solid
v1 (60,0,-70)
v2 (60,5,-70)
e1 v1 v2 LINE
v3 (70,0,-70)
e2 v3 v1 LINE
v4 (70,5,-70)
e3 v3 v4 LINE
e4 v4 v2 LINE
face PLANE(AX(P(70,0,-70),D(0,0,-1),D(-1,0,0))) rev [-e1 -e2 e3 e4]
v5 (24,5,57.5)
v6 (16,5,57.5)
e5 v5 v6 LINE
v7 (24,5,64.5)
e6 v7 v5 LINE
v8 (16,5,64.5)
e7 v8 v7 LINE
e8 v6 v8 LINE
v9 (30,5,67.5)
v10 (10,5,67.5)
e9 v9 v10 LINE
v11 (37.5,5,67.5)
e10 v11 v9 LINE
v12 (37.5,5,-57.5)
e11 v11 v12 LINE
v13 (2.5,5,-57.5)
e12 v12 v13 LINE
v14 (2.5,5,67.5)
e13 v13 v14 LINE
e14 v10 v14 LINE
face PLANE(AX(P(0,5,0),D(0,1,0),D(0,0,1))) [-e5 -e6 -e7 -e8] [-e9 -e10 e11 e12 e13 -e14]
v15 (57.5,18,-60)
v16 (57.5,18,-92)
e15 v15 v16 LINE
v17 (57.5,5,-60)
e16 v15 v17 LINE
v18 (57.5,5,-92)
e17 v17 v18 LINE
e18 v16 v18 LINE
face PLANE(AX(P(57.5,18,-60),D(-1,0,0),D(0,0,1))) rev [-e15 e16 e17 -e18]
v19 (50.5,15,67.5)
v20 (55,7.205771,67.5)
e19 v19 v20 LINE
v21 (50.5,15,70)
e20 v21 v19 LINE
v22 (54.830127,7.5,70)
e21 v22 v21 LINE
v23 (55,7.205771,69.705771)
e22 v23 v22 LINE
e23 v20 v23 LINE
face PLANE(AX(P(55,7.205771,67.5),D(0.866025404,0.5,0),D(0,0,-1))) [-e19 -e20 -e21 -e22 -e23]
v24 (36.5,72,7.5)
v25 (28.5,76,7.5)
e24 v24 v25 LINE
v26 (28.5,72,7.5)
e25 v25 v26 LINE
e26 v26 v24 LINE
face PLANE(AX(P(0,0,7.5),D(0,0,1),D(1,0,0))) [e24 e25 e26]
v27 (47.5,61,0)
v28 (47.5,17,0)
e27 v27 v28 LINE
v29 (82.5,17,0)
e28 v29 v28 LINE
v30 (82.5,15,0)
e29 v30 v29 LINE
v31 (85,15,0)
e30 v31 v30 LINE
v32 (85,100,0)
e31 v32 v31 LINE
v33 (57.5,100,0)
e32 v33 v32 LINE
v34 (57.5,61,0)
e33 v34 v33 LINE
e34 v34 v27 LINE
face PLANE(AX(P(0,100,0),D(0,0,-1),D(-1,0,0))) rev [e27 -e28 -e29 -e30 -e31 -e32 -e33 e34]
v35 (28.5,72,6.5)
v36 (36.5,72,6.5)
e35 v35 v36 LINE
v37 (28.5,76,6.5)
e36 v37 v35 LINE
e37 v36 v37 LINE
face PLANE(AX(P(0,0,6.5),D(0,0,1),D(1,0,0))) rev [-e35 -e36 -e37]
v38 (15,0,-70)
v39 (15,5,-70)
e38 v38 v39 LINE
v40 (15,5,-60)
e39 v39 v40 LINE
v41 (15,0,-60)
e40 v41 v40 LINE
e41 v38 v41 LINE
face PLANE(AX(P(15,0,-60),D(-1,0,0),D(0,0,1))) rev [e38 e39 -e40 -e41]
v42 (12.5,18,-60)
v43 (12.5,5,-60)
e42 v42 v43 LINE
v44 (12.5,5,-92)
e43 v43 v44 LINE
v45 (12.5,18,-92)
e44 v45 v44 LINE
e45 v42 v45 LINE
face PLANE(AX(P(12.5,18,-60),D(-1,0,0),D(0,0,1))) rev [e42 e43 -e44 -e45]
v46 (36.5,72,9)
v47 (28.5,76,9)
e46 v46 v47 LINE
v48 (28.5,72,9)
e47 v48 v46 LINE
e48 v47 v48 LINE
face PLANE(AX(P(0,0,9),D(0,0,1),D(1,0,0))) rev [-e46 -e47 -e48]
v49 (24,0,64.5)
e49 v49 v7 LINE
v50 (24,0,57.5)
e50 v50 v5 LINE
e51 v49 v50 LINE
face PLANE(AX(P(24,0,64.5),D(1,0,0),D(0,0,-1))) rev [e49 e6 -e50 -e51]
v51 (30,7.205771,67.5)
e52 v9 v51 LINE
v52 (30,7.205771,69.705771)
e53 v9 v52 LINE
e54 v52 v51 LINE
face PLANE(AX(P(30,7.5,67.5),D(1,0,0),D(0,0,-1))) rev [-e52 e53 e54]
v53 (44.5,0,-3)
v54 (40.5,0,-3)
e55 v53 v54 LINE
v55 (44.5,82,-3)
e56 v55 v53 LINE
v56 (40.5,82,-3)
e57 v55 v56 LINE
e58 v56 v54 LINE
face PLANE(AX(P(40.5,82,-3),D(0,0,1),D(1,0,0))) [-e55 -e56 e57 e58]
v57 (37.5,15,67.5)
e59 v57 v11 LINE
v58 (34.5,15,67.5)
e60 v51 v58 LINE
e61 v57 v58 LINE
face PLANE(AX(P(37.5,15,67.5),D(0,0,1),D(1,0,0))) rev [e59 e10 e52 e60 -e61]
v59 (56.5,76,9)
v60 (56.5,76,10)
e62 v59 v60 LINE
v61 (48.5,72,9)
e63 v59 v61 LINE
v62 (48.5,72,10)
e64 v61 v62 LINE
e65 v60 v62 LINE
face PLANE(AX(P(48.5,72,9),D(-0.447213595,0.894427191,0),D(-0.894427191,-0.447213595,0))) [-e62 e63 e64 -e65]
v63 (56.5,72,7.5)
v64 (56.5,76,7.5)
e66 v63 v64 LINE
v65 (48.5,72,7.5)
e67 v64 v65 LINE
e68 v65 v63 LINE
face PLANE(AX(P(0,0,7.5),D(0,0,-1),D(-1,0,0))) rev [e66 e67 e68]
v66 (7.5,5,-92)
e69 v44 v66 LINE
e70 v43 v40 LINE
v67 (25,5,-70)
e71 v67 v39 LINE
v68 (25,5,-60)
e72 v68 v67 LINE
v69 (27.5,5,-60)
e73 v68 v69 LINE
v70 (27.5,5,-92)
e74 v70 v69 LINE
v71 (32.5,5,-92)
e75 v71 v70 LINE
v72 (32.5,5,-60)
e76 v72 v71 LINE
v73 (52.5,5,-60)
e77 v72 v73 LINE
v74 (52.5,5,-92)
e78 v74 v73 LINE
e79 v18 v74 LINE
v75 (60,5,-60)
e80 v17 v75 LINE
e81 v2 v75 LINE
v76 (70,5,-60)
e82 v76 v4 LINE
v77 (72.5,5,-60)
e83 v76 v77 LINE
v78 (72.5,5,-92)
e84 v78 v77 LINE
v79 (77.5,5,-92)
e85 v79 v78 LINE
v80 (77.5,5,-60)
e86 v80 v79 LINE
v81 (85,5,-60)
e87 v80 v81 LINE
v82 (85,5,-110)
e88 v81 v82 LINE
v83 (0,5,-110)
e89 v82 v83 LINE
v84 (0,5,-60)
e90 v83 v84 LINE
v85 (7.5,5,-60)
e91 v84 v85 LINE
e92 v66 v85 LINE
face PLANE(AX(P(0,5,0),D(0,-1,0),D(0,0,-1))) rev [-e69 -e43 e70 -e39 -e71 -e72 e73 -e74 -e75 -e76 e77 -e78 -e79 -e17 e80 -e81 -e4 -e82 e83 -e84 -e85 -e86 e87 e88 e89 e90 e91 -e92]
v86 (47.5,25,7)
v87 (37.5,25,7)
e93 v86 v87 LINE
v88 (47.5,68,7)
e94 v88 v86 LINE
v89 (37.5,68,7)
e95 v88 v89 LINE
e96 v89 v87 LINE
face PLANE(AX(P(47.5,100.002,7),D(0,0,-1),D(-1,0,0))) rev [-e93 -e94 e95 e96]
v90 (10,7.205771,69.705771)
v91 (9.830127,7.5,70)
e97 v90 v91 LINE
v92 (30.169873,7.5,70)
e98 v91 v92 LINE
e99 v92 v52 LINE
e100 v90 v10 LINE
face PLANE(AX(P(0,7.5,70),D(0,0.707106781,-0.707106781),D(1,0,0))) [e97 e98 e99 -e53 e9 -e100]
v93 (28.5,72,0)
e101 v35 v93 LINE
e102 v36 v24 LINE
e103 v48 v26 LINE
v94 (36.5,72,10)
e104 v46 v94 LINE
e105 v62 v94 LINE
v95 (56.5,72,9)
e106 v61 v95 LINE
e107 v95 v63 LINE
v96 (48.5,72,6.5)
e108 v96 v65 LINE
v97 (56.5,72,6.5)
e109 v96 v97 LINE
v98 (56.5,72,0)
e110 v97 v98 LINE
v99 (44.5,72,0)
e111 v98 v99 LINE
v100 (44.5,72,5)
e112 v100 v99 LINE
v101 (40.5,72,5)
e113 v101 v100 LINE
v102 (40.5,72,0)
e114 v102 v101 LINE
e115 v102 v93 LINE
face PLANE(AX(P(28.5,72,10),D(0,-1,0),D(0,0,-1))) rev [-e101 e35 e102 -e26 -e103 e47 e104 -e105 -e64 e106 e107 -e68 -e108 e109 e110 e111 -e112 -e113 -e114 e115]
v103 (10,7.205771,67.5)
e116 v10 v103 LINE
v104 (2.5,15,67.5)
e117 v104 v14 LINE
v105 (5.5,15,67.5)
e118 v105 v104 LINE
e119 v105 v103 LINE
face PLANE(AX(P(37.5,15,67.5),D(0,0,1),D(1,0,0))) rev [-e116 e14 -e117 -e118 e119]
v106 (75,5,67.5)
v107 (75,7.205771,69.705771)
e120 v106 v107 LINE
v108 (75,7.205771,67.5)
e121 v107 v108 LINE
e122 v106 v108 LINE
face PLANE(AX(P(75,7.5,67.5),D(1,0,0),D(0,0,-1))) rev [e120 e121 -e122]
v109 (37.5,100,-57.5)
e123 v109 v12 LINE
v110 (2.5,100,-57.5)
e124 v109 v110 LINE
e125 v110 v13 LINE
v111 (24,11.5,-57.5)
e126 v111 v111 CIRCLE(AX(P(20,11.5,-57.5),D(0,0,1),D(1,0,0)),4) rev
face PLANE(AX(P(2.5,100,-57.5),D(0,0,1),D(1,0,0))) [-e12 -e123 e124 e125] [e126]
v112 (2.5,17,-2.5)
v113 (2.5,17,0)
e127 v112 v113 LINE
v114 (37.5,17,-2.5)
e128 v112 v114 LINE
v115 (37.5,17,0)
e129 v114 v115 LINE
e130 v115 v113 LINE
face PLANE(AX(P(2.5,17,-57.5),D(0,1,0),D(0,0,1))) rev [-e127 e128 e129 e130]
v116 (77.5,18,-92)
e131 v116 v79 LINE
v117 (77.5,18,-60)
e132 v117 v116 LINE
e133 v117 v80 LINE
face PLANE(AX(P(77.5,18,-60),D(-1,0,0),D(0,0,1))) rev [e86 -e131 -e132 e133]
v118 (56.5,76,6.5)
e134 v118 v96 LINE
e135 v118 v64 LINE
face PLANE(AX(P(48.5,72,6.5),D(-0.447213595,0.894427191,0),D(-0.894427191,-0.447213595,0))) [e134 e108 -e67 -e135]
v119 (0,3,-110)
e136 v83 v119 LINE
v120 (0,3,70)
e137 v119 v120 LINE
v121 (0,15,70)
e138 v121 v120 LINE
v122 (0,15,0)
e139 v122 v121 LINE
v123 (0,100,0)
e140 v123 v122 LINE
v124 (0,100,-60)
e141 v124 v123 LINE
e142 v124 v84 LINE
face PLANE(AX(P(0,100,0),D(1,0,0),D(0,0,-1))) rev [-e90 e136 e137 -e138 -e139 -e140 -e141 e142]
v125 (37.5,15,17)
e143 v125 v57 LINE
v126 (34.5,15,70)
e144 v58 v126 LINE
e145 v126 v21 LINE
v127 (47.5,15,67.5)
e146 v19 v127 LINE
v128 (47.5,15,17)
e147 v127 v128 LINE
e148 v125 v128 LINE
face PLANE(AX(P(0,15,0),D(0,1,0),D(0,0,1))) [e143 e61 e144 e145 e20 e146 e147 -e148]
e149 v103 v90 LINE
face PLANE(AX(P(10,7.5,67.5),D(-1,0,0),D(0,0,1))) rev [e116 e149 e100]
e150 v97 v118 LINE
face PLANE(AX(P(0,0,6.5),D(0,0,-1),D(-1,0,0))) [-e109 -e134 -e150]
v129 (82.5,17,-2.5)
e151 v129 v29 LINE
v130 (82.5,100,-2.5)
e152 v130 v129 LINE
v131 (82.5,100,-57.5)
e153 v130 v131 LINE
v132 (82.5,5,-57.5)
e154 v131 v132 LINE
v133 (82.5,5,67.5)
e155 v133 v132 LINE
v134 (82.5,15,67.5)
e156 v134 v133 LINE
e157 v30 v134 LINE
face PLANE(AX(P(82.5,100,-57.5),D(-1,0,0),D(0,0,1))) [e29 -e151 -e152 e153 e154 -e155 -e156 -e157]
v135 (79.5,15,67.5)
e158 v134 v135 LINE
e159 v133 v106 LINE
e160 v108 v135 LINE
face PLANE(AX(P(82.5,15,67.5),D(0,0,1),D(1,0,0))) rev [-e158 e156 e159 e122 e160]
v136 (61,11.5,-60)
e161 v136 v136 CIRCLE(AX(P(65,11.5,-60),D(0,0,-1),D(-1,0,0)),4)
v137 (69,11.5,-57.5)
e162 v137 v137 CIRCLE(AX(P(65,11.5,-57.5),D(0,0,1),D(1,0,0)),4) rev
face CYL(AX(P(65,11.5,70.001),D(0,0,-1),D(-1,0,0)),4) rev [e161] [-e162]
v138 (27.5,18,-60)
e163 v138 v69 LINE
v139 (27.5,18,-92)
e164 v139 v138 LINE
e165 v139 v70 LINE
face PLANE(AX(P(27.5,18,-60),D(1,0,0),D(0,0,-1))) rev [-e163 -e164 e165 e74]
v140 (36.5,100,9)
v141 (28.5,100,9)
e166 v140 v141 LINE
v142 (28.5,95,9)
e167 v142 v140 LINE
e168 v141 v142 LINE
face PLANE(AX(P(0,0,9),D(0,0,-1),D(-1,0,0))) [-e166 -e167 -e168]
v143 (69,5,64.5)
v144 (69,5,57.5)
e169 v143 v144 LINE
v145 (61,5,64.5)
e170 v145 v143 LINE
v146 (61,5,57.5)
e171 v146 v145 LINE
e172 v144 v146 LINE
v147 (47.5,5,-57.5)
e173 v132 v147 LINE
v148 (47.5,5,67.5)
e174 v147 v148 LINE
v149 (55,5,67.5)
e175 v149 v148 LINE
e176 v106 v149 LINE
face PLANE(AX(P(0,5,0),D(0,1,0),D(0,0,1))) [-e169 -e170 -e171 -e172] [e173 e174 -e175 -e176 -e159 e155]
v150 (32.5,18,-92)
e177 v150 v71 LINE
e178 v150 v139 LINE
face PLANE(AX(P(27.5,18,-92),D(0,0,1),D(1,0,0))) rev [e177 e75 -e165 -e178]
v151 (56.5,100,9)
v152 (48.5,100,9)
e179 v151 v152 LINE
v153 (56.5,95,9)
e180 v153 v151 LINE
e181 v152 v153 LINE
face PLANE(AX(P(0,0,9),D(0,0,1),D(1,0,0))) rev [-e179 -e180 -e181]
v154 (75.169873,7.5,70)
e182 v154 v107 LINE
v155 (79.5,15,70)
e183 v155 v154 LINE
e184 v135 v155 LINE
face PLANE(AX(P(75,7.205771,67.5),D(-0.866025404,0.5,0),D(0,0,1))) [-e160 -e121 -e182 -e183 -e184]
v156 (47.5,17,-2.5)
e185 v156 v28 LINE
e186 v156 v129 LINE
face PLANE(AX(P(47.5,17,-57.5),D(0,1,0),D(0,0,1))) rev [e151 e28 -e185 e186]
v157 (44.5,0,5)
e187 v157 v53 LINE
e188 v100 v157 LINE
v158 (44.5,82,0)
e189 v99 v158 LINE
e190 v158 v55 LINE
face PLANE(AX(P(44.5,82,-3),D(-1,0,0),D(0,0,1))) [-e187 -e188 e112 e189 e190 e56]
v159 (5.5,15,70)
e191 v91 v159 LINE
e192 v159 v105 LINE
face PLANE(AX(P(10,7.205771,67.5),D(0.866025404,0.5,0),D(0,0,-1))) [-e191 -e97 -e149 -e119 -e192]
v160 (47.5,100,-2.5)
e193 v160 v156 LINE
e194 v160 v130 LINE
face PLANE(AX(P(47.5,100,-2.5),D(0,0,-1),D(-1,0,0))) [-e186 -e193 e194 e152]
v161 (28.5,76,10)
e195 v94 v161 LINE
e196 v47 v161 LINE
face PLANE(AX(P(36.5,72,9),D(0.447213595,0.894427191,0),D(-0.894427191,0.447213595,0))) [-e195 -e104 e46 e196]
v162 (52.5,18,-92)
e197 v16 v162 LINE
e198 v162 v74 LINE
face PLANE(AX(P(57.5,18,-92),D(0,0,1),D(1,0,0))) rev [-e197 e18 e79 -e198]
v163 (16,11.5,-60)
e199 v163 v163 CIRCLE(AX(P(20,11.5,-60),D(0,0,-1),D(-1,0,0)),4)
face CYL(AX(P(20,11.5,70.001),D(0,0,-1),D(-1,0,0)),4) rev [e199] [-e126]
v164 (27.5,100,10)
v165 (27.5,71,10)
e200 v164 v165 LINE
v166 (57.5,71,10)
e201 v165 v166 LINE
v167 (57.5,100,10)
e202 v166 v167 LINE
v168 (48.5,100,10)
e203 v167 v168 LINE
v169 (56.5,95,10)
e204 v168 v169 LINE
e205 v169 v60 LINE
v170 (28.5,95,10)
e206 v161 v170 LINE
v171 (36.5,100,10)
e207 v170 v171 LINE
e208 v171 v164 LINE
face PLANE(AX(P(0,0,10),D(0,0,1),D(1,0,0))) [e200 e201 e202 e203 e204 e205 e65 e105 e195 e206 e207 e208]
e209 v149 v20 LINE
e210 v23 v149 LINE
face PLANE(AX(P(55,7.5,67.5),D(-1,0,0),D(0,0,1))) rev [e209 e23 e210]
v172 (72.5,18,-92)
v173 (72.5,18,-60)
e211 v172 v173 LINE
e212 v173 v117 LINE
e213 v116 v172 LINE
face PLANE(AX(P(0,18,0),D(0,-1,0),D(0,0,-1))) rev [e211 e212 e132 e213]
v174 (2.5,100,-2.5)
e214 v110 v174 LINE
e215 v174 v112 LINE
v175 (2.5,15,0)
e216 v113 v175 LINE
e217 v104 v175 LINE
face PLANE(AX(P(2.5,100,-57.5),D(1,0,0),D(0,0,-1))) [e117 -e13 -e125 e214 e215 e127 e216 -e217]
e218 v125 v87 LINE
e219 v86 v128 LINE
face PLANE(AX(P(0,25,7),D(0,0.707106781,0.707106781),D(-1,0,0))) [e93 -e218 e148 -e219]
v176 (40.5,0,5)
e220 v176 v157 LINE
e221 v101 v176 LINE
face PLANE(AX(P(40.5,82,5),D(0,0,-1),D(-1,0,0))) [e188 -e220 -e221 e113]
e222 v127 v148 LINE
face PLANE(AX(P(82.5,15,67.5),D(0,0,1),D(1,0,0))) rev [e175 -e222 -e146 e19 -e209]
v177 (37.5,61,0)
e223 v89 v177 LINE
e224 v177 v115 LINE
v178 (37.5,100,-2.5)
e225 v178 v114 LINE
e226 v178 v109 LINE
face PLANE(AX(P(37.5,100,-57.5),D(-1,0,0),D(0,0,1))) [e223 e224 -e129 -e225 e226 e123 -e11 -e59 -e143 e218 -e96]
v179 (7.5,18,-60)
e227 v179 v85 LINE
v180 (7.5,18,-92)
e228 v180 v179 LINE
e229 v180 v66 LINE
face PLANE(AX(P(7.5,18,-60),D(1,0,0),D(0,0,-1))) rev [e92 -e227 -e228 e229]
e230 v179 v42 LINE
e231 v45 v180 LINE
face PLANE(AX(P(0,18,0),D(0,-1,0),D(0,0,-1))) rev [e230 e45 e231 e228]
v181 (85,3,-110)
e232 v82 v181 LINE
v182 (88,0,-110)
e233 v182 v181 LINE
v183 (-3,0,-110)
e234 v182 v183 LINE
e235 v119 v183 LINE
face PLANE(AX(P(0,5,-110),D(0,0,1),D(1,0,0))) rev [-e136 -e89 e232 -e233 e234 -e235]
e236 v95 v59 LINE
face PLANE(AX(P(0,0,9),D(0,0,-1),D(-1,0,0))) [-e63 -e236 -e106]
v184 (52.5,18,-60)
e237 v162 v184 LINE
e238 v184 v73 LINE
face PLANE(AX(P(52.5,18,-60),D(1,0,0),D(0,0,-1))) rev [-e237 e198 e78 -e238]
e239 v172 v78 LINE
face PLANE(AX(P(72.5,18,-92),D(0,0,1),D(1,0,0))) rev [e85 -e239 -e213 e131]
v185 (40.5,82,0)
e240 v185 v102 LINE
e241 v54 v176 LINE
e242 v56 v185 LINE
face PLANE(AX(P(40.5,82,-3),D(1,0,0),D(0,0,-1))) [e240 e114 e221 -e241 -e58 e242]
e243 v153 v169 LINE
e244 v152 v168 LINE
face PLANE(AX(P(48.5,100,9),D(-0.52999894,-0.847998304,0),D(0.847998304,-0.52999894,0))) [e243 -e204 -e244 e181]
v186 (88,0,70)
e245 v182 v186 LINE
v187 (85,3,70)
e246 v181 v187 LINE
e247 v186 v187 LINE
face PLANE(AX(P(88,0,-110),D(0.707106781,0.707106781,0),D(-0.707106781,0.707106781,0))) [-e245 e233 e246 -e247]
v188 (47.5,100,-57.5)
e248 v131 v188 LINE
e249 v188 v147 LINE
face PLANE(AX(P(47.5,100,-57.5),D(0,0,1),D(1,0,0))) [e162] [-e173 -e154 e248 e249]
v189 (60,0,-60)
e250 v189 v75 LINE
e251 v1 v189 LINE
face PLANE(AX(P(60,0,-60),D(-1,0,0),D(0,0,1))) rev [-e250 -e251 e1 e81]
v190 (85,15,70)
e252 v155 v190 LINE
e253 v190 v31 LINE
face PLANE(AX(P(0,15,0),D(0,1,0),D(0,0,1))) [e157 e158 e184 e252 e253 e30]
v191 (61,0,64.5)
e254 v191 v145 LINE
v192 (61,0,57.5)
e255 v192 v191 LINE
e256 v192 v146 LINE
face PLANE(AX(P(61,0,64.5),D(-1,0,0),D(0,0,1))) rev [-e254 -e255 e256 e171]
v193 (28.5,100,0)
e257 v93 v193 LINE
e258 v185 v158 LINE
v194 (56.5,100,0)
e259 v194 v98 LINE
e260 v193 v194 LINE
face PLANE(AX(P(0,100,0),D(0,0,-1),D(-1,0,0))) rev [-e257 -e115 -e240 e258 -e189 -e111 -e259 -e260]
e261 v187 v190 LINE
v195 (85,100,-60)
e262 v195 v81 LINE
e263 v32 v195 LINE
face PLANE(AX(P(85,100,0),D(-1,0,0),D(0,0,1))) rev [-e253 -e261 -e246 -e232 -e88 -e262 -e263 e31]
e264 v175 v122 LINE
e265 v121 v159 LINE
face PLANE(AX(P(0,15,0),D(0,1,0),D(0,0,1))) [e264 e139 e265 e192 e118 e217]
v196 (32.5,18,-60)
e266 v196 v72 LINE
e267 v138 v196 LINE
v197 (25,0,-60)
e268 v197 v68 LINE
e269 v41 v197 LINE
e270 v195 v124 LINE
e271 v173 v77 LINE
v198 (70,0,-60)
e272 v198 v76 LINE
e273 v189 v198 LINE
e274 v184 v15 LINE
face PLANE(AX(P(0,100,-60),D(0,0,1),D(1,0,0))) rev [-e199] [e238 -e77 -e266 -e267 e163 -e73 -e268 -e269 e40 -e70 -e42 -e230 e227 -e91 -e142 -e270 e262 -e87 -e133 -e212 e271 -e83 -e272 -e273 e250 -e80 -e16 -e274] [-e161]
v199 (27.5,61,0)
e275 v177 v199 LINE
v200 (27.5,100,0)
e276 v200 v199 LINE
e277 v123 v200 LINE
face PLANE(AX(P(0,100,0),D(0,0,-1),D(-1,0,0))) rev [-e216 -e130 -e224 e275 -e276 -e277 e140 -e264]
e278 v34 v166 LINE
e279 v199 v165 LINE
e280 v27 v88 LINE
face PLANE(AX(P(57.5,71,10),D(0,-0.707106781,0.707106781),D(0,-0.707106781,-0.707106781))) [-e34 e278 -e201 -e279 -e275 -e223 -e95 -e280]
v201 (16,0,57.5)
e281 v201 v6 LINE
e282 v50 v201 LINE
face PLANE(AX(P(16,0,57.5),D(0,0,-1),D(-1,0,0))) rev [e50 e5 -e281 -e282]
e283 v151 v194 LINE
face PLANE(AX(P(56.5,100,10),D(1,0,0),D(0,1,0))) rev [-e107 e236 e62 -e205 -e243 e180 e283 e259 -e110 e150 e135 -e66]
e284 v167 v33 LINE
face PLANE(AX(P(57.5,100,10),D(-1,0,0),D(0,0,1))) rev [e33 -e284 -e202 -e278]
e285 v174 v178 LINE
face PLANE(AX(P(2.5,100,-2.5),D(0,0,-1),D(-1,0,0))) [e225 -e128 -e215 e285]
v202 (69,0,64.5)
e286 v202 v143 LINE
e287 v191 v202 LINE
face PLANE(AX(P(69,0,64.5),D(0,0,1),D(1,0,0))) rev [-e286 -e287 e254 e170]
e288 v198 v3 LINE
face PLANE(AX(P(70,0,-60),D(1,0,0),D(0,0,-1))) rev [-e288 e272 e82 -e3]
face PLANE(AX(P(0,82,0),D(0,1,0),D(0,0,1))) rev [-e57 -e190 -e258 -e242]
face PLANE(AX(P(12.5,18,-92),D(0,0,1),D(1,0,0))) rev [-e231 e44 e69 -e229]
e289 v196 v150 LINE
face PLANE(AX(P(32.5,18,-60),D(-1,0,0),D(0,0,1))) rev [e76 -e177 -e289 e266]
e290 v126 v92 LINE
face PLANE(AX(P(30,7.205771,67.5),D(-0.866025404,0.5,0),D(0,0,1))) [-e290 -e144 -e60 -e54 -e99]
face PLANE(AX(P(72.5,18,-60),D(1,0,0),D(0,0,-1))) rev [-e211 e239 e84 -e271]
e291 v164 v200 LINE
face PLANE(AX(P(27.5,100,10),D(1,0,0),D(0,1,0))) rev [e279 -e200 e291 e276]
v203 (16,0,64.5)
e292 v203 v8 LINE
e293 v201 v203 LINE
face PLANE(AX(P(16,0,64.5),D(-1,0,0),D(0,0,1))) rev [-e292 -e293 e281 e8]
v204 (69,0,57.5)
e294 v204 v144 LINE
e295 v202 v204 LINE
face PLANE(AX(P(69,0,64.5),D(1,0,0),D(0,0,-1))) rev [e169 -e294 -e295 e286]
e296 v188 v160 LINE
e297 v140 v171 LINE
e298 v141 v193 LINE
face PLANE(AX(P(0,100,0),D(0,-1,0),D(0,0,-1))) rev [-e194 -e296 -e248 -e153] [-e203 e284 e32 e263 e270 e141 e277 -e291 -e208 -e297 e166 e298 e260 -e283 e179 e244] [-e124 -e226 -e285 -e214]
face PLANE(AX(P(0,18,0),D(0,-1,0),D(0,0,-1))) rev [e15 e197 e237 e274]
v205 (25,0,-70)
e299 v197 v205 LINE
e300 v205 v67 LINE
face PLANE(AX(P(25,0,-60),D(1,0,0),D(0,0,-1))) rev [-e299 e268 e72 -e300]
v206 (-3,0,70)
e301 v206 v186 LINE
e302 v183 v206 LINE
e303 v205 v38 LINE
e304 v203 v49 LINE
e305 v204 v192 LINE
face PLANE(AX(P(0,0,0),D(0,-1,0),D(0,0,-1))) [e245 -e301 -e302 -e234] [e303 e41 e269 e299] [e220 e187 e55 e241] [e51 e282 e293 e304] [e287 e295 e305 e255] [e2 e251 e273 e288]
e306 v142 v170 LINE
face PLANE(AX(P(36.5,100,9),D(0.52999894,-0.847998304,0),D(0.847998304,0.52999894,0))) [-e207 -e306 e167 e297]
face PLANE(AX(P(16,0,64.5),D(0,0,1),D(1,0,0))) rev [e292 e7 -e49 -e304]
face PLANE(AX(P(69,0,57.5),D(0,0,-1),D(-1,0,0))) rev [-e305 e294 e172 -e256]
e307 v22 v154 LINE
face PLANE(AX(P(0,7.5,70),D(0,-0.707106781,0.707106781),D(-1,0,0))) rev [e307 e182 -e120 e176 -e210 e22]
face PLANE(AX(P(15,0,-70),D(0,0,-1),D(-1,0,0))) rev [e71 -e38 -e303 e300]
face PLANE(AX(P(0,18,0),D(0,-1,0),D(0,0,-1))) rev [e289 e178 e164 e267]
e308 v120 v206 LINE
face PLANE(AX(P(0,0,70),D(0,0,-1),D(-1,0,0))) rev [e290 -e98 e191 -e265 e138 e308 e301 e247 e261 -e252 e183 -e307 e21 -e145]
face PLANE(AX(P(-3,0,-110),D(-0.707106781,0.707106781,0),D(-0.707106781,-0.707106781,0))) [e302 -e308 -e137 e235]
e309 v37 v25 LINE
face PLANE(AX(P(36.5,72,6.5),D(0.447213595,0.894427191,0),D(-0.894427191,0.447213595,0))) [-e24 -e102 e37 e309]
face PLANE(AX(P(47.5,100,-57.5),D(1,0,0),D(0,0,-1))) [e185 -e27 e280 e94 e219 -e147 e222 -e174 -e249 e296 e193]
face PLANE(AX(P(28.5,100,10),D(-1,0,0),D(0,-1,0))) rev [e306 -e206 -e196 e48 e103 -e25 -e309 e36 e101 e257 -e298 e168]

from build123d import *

# Parameters (mm, degrees)
SKETCH1_W                                 = 85
SKETCH1_H                                 = 60
BOSS_EXTRUDE1_DEPTH                       = 100
CUT_EXTRUDE1_START                        = 5
SKETCH2_W                                 = 35
SKETCH2_H                                 = 55
CUT_EXTRUDE1_DEPTH                        = 95
SKETCH3_W                                 = 85
SKETCH3_H                                 = 5
BOSS_EXTRUDE2_DEPTH                       = 70
BOSS_EXTRUDE3_DEPTH                       = 10
SKETCH5_W                                 = 20
SKETCH5_H                                 = 2.5
CUT_EXTRUDE2_DEPTH                        = 7.5
SKETCH6_W                                 = 35
SKETCH6_H                                 = 12
CUT_EXTRUDE4_DEPTH                        = 57.5
CUT_EXTRUDE6_REACH                        = 186.73
SKETCH7_R                                 = 4
SKETCH9_W                                 = 85
SKETCH9_H                                 = 50
BOSS_EXTRUDE4_DEPTH                       = 5
SKETCH13_W                                = 8
SKETCH13_H                                = 7
CUT_EXTRUDE8_BUTTON_HOLES_DEPTH           = 169.374582405
BOSS_EXTRUDE5_OLED_MOUNT_DEPTH            = 10
BOSS_EXTRUDE6_OLED_MOUNT_DEPTH            = 1
BOSS_EXTRUDE7_START                       = -2.5
BOSS_EXTRUDE7_OLED_MOUNT_DEPTH            = 1
BOSS_EXTRUDE8_OLED_MOUNT_DEPTH            = 1
BOSS_EXTRUDE13_OLED_MOUNT_SUPPORT_DEPTH   = 30
CUT_EXTRUDE9_OLED_CABLE_DEPTH             = 10
CUT_EXTRUDE9_OLED_CABLE_DEPTH_BACK        = 157.553505231
SKETCH18_W                                = 4
SKETCH18_H                                = 8
BOSS_EXTRUDE12_OLED_CABLE_GUIDE_REACH     = 164.942
SKETCH20_W                                = 10
SKETCH20_H                                = 10
CUT_EXTRUDE10_SOLENOID_WIRE_HOLE_DEPTH    = 169.374582405
SKETCH21_W                                = 5
SKETCH21_H                                = 32
BOSS_EXTRUDE9_SOLENOID_SIDE_SUPPORT_DEPTH = 13
CHAMFER3_THUMB_SIZE                       = 2.5
CHAMFER5_THUMB_SIZE                       = 4.5
CHAMFER5_THUMB_SIZE2                      = 7.794228634
CHAMFER5_THUMB_PART_2_SIZE                = 4.5
CHAMFER5_THUMB_PART_2_SIZE2               = 7.794228634
CHAMFER5_THUMB_PART_3_SIZE                = 4.5
CHAMFER5_THUMB_PART_3_SIZE2               = 7.794228634
BOSS_EXTRUDE5_GUIDE_DEPTH                 = 180
SKETCH49_W                                = 10
SKETCH49_H                                = 10
BOSS_EXTRUDE14_DEPTH                      = 10
CHAMFER8_SIZE                             = 10


with BuildPart() as part:
    # Sketch1 → Boss-Extrude1 (new body)
    with BuildSketch(Plane(origin=(0, 0, 0), x_dir=(1, 0, 0), z_dir=(0, 1, 0))):
        with Locations((42.5, 30)):
            Rectangle(SKETCH1_W, SKETCH1_H)
    extrude(amount=BOSS_EXTRUDE1_DEPTH)

    # Sketch2 → Cut-Extrude1 (cut)
    with BuildSketch(Plane(origin=(0, 0, 0), x_dir=(1, 0, 0), z_dir=(0, 1, 0)).offset(CUT_EXTRUDE1_START)):
        with Locations((20, 30)):
            Rectangle(SKETCH2_W, SKETCH2_H)
        with Locations((65, 30)):
            Rectangle(SKETCH2_W, SKETCH2_H)
    extrude(amount=CUT_EXTRUDE1_DEPTH, mode=Mode.SUBTRACT)

    # Sketch3 → Boss-Extrude2 (add)
    with BuildSketch(Plane.XY):
        with Locations((42.5, 2.5)):
            Rectangle(SKETCH3_W, SKETCH3_H)
    extrude(amount=BOSS_EXTRUDE2_DEPTH)

    # Sketch4 → Boss-Extrude3 (add)
    with BuildSketch(Plane(origin=(0, 5, 0), x_dir=(1, 0, 0), z_dir=(0, 1, 0))):
        Polygon((85, 0), (82.5, 0), (82.5, -67.5), (47.5, -67.5), (47.5, 0), (37.5, 0), (37.5, -67.5), (2.5, -67.5), (2.5, 0), (0, 0), (0, -70), (85, -70), align=None)
    extrude(amount=BOSS_EXTRUDE3_DEPTH)

    # Sketch5 → Cut-Extrude2 (cut)
    with BuildSketch(Plane(origin=(0, 15, 0), x_dir=(1, 0, 0), z_dir=(0, 1, 0))):
        with Locations((20, -68.75)):
            Rectangle(SKETCH5_W, SKETCH5_H)
        with Locations((65, -68.75)):
            Rectangle(SKETCH5_W, SKETCH5_H)
    extrude(amount=-CUT_EXTRUDE2_DEPTH, mode=Mode.SUBTRACT)

    # Sketch6 → Cut-Extrude4 (cut)
    with BuildSketch(Plane.XY):
        with Locations((20, 11)):
            Rectangle(SKETCH6_W, SKETCH6_H)
        with Locations((65, 11)):
            Rectangle(SKETCH6_W, SKETCH6_H)
    extrude(amount=-CUT_EXTRUDE4_DEPTH, mode=Mode.SUBTRACT)

    # Sketch7 → Cut-Extrude6 (cut, up to next)
    with BuildSketch(Plane(origin=(0, 0, -60), x_dir=(-1, 0, 0), z_dir=(0, 0, -1)), mode=Mode.PRIVATE) as cut_extrude6_sk1:
        with Locations((-20, 11.5)):
            Circle(SKETCH7_R)
    cut_extrude6_tool1 = extrude(cut_extrude6_sk1.sketch, amount=-CUT_EXTRUDE6_REACH, mode=Mode.PRIVATE) & part.part
    # Sketch7 → Cut-Extrude6 (cut, up to next)
    with BuildSketch(Plane(origin=(0, 0, -60), x_dir=(-1, 0, 0), z_dir=(0, 0, -1)), mode=Mode.PRIVATE) as cut_extrude6_sk2:
        with Locations((-65, 11.5)):
            Circle(SKETCH7_R)
    cut_extrude6_tool2 = extrude(cut_extrude6_sk2.sketch, amount=-CUT_EXTRUDE6_REACH, mode=Mode.PRIVATE) & part.part
    add(cut_extrude6_tool1.solids().sort_by_distance((20, 11.5, -60))[0], mode=Mode.SUBTRACT)
    add(cut_extrude6_tool2.solids().sort_by_distance((65, 11.5, -60))[0], mode=Mode.SUBTRACT)

    # Sketch9 → Boss-Extrude4 (add)
    with BuildSketch(Plane(origin=(0, 0, 0), x_dir=(1, 0, 0), z_dir=(0, 1, 0))):
        with Locations((42.5, 85)):
            Rectangle(SKETCH9_W, SKETCH9_H)
    extrude(amount=BOSS_EXTRUDE4_DEPTH)

    # Sketch13 → Cut-Extrude8 (Button Holes) (cut, through all)
    with BuildSketch(Plane(origin=(0, 5, 0), x_dir=(1, 0, 0), z_dir=(0, 1, 0))):
        with Locations((20, -61)):
            Rectangle(SKETCH13_W, SKETCH13_H)
        with Locations((65, -61)):
            Rectangle(SKETCH13_W, SKETCH13_H)
    extrude(amount=-CUT_EXTRUDE8_BUTTON_HOLES_DEPTH, mode=Mode.SUBTRACT)

    # Sketch14 → Boss-Extrude5 (OLED Mount) (add)
    with BuildSketch(Plane.XY):
        Polygon((27.5, 100), (28.5, 100), (28.5, 72), (56.5, 72), (56.5, 100), (57.5, 100), (57.5, 71), (52.172712592, 71), (32.827287408, 71), (27.5, 71), align=None)
    extrude(amount=BOSS_EXTRUDE5_OLED_MOUNT_DEPTH)

    # Sketch15 → Boss-Extrude6 (OLED Mount) (add)
    with BuildSketch(Plane.XY.offset(10)):
        Polygon((28.5, 72), (36.5, 72), (28.5, 76), align=None)
        Polygon((56.5, 76), (56.5, 72), (48.5, 72), align=None)
    extrude(amount=-BOSS_EXTRUDE6_OLED_MOUNT_DEPTH)

    # Sketch15<2> → Boss-Extrude7 (OLED Mount) (add)
    with BuildSketch(Plane.XY.offset(10).offset(BOSS_EXTRUDE7_START)):
        Polygon((28.5, 72), (36.5, 72), (28.5, 76), align=None)
        Polygon((56.5, 76), (56.5, 72), (48.5, 72), align=None)
    extrude(amount=-BOSS_EXTRUDE7_OLED_MOUNT_DEPTH)

    # Sketch17 → Boss-Extrude8 (OLED Mount) (add)
    with BuildSketch(Plane.XY.offset(10)):
        Polygon((56.5, 95), (56.5, 100), (48.5, 100), align=None)
        Polygon((28.5, 100), (36.5, 100), (28.5, 95), align=None)
    extrude(amount=-BOSS_EXTRUDE8_OLED_MOUNT_DEPTH)

    # Sketch32 → Boss-Extrude13 OLED Mount Support) (add)
    with BuildSketch(Plane.ZY.offset(-27.5)):
        Polygon((0, 71), (10, 71), (0, 61), align=None)
    extrude(amount=-BOSS_EXTRUDE13_OLED_MOUNT_SUPPORT_DEPTH)

    # Sketch18 → Cut-Extrude9 (OLED Cable) (cut, two sides: drawn at the far end of the back side and taken through both)
    with BuildSketch(Plane(origin=(0, 72, 0), x_dir=(1, 0, 0), z_dir=(0, 1, 0)).offset(-CUT_EXTRUDE9_OLED_CABLE_DEPTH_BACK)):
        with Locations((42.5, -1)):
            Rectangle(SKETCH18_W, SKETCH18_H)
    extrude(amount=CUT_EXTRUDE9_OLED_CABLE_DEPTH + CUT_EXTRUDE9_OLED_CABLE_DEPTH_BACK, mode=Mode.SUBTRACT)

    # Boss-Extrude12 (OLED Cable Guide): up to this plane
    boss_extrude12_oled_cable_guide_end = Plane(origin=(57.5, 71, 10), z_dir=(0, -0.7071067811865475, 0.7071067811865476))
    # Sketch31 → Boss-Extrude12 (OLED Cable Guide) (add, up to the surface)
    with BuildSketch(Plane(origin=(0, 15, 0), x_dir=(1, 0, 0), z_dir=(0, 1, 0)), mode=Mode.PRIVATE) as boss_extrude12_oled_cable_guide_sk1:
        Polygon((37.5, 0), (40.5, 0), (40.5, -5), (44.5, -5), (44.5, 0), (47.5, 0), (47.5, -7), (37.5, -7), align=None)
    boss_extrude12_oled_cable_guide_tool1 = split(extrude(boss_extrude12_oled_cable_guide_sk1.sketch, amount=BOSS_EXTRUDE12_OLED_CABLE_GUIDE_REACH, mode=Mode.PRIVATE), bisect_by=boss_extrude12_oled_cable_guide_end, keep=Keep.BOTH, mode=Mode.PRIVATE)
    add(boss_extrude12_oled_cable_guide_tool1.solids().sort_by_distance((39, 15, 0.122066))[0])

    # Sketch20 → Cut-Extrude10 (Solenoid Wire Hole) (cut, through all)
    with BuildSketch(Plane(origin=(0, 5, 0), x_dir=(1, 0, 0), z_dir=(0, 1, 0))):
        with Locations((65, 65)):
            Rectangle(SKETCH20_W, SKETCH20_H)
        with Locations((20, 65)):
            Rectangle(SKETCH20_W, SKETCH20_H)
    extrude(amount=-CUT_EXTRUDE10_SOLENOID_WIRE_HOLE_DEPTH, mode=Mode.SUBTRACT)

    # Sketch21 → Boss-Extrude9 (Solenoid Side Support) (add)
    with BuildSketch(Plane(origin=(0, 5, 0), x_dir=(1, 0, 0), z_dir=(0, 1, 0))):
        with Locations((75, 76)):
            Rectangle(SKETCH21_W, SKETCH21_H)
        with Locations((55, 76)):
            Rectangle(SKETCH21_W, SKETCH21_H)
        with Locations((30, 76)):
            Rectangle(SKETCH21_W, SKETCH21_H)
        with Locations((10, 76)):
            Rectangle(SKETCH21_W, SKETCH21_H)
    extrude(amount=BOSS_EXTRUDE9_SOLENOID_SIDE_SUPPORT_DEPTH)

    # Chamfer3 (Thumb)
    chamfer3_thumb_edges = [part.edges().sort_by_distance(p)[0] for p in [
        (20, 7.5, 67.5),
        (65, 7.5, 67.5),
    ]]
    chamfer(chamfer3_thumb_edges, length=CHAMFER3_THUMB_SIZE - 0.0001)  # a hair under: the kernel refuses the full size

    # Chamfer5 (Thumb)
    chamfer5_thumb_edges = [part.edges().sort_by_distance(p)[0] for p in [
        (75, 15, 68.75),
    ]]
    chamfer5_thumb_side = [part.faces().sort_by_distance(p)[0] for p in [
        (83.266129032, 15, 38.266129032),
    ]]
    chamfer(chamfer5_thumb_edges, length=CHAMFER5_THUMB_SIZE, length2=CHAMFER5_THUMB_SIZE2, reference=chamfer5_thumb_side[0])

    # Chamfer5 (Thumb) part 2
    chamfer5_thumb_part_2_edges = [part.edges().sort_by_distance(p)[0] for p in [
        (55, 15, 68.75),
        (30, 15, 68.75),
    ]]
    chamfer5_thumb_part_2_side = [part.faces().sort_by_distance(p)[0] for p in [
        (42.5, 15, 40.199438202),
    ]]
    chamfer(chamfer5_thumb_part_2_edges, length=CHAMFER5_THUMB_PART_2_SIZE, length2=CHAMFER5_THUMB_PART_2_SIZE2, reference=chamfer5_thumb_part_2_side[0])

    # Chamfer5 (Thumb) part 3
    chamfer5_thumb_part_3_edges = [part.edges().sort_by_distance(p)[0] for p in [
        (10, 15, 68.75),
    ]]
    chamfer5_thumb_part_3_side = [part.faces().sort_by_distance(p)[0] for p in [
        (1.733870968, 15, 38.266129032),
    ]]
    chamfer(chamfer5_thumb_part_3_edges, length=CHAMFER5_THUMB_PART_3_SIZE, length2=CHAMFER5_THUMB_PART_3_SIZE2, reference=chamfer5_thumb_part_3_side[0])

    # Sketch37 → Boss-Extrude5 (Guide) (add, through all)
    with BuildSketch(Plane.XY.offset(70)):
        Polygon((85, 0), (88, 0), (85, 3), align=None)
        Polygon((0, 0), (-3, 0), (0, 3), align=None)
    extrude(amount=-BOSS_EXTRUDE5_GUIDE_DEPTH)

    # Sketch49 → Boss-Extrude14 (add)
    with BuildSketch(Plane(origin=(0, 15, 0), x_dir=(1, 0, 0), z_dir=(0, 1, 0))):
        with Locations((42.5, -12)):
            Rectangle(SKETCH49_W, SKETCH49_H)
    extrude(amount=BOSS_EXTRUDE14_DEPTH)

    # Chamfer8
    chamfer8_edges = [part.edges().sort_by_distance(p)[0] for p in [
        (42.5, 25, 17),
    ]]
    chamfer(chamfer8_edges, length=CHAMFER8_SIZE - 0.0001)  # a hair under: the kernel refuses the full size


solid = part.part
